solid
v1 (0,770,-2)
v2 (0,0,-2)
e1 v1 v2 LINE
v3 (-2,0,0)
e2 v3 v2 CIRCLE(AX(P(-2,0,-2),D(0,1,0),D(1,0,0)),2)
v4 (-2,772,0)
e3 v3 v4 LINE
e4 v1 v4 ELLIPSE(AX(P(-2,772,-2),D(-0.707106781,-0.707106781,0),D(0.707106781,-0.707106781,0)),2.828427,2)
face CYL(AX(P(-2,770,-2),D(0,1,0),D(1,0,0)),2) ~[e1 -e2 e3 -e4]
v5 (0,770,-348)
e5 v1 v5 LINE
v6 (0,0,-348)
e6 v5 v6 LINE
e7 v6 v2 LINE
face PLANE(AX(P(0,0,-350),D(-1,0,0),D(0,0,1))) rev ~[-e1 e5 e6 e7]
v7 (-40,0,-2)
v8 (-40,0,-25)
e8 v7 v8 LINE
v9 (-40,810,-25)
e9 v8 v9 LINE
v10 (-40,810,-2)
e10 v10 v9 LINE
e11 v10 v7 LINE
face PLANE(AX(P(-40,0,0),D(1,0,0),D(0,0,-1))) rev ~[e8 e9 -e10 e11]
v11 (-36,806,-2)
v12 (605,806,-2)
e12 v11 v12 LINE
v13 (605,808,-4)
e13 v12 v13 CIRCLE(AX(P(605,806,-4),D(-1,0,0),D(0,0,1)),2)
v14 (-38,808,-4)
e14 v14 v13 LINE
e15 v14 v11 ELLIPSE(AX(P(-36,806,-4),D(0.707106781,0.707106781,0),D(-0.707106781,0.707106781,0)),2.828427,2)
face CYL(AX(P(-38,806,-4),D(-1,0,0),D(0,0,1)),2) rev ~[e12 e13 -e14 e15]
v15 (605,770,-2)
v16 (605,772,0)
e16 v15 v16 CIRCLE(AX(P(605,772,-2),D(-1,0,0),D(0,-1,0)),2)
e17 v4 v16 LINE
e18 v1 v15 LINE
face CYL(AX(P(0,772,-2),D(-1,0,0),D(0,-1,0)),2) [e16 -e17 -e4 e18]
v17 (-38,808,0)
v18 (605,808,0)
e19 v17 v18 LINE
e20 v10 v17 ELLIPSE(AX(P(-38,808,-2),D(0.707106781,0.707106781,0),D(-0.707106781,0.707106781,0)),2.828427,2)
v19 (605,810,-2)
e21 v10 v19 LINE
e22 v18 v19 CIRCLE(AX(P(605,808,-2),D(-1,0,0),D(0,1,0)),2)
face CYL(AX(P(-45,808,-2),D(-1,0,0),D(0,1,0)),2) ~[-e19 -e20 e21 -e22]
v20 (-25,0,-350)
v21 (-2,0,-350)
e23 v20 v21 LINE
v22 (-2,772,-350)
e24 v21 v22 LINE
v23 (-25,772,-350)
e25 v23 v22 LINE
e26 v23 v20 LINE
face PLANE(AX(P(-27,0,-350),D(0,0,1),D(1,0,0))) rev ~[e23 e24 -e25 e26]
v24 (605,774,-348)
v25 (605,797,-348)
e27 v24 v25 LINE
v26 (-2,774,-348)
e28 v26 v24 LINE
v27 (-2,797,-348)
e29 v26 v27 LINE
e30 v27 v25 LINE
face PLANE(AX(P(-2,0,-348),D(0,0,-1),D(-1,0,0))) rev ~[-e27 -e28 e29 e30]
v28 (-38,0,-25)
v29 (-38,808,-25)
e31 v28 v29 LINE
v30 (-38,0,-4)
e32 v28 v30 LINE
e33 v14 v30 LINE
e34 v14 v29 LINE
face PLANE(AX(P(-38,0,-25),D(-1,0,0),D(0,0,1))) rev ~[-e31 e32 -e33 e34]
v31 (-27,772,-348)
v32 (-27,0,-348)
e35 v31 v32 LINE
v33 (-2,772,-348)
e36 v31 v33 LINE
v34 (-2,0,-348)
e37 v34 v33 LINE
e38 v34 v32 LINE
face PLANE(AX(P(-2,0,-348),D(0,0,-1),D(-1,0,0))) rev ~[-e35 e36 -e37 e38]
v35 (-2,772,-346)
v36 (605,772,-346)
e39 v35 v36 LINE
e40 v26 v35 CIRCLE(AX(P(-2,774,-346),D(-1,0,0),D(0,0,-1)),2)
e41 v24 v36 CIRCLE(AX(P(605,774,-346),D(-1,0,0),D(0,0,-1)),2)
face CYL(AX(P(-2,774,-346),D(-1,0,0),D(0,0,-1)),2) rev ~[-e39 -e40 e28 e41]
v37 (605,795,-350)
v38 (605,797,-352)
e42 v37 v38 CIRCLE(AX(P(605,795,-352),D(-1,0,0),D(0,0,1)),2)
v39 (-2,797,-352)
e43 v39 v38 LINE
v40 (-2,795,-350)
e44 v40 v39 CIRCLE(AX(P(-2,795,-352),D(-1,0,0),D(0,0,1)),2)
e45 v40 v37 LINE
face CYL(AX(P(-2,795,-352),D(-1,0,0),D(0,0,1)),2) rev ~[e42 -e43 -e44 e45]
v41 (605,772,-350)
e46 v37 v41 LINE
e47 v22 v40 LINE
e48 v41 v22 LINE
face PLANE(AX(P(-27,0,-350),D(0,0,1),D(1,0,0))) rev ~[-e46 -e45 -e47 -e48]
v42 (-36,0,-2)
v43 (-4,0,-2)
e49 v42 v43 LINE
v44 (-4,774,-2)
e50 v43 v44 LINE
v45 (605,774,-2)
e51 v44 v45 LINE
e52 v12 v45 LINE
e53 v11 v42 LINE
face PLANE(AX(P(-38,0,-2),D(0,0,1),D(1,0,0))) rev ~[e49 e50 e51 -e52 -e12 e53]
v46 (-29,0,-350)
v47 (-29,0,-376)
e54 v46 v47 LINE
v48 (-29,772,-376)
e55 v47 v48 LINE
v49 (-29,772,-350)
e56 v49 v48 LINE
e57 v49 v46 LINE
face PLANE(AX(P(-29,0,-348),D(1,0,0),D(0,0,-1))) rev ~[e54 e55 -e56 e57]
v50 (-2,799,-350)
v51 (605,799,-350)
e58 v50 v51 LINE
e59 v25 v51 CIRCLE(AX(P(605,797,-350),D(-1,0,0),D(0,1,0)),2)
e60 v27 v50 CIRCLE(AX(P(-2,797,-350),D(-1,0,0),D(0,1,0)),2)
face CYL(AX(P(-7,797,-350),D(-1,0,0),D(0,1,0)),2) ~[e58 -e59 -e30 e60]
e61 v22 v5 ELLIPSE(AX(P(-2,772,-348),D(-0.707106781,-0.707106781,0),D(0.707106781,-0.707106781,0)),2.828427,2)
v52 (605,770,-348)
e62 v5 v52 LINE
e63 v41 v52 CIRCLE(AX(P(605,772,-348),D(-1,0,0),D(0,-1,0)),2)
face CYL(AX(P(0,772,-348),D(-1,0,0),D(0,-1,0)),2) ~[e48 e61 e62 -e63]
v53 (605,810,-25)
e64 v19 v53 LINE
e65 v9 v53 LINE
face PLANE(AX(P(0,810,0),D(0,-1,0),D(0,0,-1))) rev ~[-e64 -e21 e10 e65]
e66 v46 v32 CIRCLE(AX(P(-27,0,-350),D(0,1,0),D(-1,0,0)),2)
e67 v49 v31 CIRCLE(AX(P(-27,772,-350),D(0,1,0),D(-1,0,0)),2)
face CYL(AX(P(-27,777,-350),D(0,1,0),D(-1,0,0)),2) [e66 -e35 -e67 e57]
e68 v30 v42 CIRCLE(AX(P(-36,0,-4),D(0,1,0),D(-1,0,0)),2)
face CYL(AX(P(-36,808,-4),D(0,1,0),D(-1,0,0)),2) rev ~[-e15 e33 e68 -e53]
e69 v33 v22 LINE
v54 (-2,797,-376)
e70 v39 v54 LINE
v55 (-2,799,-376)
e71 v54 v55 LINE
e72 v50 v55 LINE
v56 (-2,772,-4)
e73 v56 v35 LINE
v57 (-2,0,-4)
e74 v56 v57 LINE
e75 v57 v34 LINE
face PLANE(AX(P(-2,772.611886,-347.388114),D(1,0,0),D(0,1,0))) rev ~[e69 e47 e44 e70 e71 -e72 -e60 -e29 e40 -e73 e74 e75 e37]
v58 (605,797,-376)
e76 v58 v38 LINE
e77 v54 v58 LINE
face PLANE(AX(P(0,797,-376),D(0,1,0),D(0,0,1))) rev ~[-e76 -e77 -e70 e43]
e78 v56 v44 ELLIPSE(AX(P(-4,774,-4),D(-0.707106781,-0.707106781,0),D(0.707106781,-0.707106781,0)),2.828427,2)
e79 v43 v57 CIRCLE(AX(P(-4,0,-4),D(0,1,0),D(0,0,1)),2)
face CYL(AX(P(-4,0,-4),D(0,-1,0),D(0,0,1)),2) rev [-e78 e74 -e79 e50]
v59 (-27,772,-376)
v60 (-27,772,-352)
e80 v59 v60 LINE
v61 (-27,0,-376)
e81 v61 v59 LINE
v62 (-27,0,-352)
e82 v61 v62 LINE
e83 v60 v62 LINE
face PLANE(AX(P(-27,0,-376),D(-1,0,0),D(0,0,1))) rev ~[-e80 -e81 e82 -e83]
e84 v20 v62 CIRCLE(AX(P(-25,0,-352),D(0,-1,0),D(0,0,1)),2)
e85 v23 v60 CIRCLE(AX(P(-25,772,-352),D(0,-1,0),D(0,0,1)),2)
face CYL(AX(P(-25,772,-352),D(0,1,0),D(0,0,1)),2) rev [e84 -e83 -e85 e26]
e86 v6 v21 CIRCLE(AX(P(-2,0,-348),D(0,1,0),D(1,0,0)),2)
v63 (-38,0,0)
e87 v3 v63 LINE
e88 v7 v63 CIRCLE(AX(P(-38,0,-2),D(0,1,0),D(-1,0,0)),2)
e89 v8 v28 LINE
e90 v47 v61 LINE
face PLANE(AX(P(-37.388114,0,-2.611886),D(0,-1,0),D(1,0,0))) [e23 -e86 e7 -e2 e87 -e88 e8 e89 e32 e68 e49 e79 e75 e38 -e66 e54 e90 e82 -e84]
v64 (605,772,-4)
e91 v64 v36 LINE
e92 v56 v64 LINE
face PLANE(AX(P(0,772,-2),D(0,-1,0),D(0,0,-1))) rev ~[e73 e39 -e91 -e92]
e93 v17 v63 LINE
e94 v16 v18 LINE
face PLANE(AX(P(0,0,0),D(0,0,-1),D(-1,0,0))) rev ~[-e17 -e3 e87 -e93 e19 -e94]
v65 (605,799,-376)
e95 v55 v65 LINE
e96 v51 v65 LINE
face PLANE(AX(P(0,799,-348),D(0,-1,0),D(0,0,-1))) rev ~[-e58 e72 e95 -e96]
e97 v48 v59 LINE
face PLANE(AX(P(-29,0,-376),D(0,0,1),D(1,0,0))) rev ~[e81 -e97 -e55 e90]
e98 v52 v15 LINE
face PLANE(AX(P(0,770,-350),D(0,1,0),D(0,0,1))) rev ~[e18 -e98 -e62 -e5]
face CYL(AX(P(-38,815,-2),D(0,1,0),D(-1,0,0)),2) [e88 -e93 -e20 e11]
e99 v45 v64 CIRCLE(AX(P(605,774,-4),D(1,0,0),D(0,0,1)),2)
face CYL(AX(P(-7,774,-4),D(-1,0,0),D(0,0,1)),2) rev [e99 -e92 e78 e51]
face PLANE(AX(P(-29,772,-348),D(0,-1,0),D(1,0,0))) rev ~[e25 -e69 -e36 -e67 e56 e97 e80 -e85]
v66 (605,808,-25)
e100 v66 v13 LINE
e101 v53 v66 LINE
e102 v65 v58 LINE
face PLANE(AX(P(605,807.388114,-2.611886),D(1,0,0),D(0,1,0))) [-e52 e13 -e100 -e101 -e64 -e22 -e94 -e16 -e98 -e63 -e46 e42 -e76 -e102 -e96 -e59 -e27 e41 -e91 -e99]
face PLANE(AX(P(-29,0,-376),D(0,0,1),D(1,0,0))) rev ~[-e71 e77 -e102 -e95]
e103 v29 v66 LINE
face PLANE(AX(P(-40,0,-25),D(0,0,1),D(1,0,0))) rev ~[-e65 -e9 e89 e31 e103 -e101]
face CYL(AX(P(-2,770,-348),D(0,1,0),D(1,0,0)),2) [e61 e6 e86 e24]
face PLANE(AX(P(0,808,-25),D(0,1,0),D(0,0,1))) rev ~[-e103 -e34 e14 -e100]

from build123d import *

# Parameters (mm, degrees)
F3_W         = 27
F3_H         = 27
F4_DEPTH     = 30
F5_T1_DEPTH  = 607
F5_T3_DEPTH  = 772
F5_T5_DEPTH  = 808
F5_T7_DEPTH  = 643
F5_T13_DEPTH = 777
F5_T17_DEPTH = 612
F5_T20_DEPTH = 617
F5_T22_DEPTH = 782
F5_T24_DEPTH = 820
F5_T26_DEPTH = 775
F5_T28_DEPTH = 610
F5_T30_DEPTH = 655
F5_T36_DEPTH = 780
F5_T40_DEPTH = 615
F5_T47_DEPTH = 780
F5_T51_DEPTH = 615


# Not quite as in the source:
# - a fillet or chamfer that OpenCascade refuses, or shapes differently, is made with other operations: its cross-section is extruded or revolved along the edge and cut away or added


with BuildPart() as f2:
    # F2: sweep along a path in F1
    with BuildLine(Plane.XY) as f2_path:
        Line((0, 0), (0, 770))
        Line((0, 770), (605, 770))
    # F0 (on Front) → F2 (sweep)
    with BuildSketch(Plane.XZ):
        Polygon((0, -350), (0, 0), (-40, 0), (-40, -25), (-38, -25), (-38, -2), (-2, -2), (-2, -348), (-29, -348), (-29, -376), (-27, -376), (-27, -350), align=None)
    sweep(path=f2_path.line, transition=Transition.RIGHT)

    # F3 (on face) → F4 (cut)
    with BuildSketch(Plane.XY.offset(-348)):
        with Locations((-15.5, 785.5)):
            Rectangle(F3_W, F3_H)
    extrude(amount=-F4_DEPTH, mode=Mode.SUBTRACT)

    # F5: fillet of radius 2 on 15 edges, made by hand

    # F5_s2 → F5_t1 (join)
    with BuildSketch(Plane.YZ.offset(-2)):
        with BuildLine():
            ThreePointArc((774, -348), (772.5857864376, -347.4142135624), (772, -346))
            Line((772, -346), (772, -348))
            Line((772, -348), (774, -348))
        make_face()
        with BuildLine():
            ThreePointArc((774, -2), (772.5857864376, -2.5857864376), (772, -4))
            Line((772, -4), (772, -2))
            Line((772, -2), (774, -2))
        make_face()
        with BuildLine():
            ThreePointArc((795, -350), (796.4142135624, -350.5857864376), (797, -352))
            Line((797, -352), (797, -350))
            Line((797, -350), (795, -350))
        make_face()
    extrude(amount=F5_T1_DEPTH)

    # F5_s4 → F5_t3 (join)
    with BuildSketch(Plane.XZ.offset(-772)):
        with BuildLine():
            ThreePointArc((-4, -2), (-2.5857864376, -2.5857864376), (-2, -4))
            Line((-2, -4), (-2, -2))
            Line((-2, -2), (-4, -2))
        make_face()
        with BuildLine():
            ThreePointArc((-25, -350), (-26.4142135624, -350.5857864376), (-27, -352))
            Line((-27, -352), (-27, -350))
            Line((-27, -350), (-25, -350))
        make_face()
    extrude(amount=F5_T3_DEPTH)

    # F5_s6 → F5_t5 (join)
    with BuildSketch(Plane.XZ.offset(-808)):
        with BuildLine():
            ThreePointArc((-38, -4), (-37.4142135624, -2.5857864376), (-36, -2))
            Line((-36, -2), (-38, -2))
            Line((-38, -2), (-38, -4))
        make_face()
    extrude(amount=F5_T5_DEPTH)

    # F5_s8 → F5_t7 (join)
    with BuildSketch(Plane.YZ.offset(-38)):
        with BuildLine():
            ThreePointArc((806, -2), (807.4142135624, -2.5857864376), (808, -4))
            Line((808, -4), (808, -2))
            Line((808, -2), (806, -2))
        make_face()
    extrude(amount=F5_T7_DEPTH)


with BuildPart() as f5_tool11:
    # F5_s12 → F5_t13 (new body)
    with BuildSketch(Plane.XZ):
        with BuildLine():
            ThreePointArc((-4, -2), (-2.5857864376, -2.5857864376), (-2, -4))
            Line((-2, -4), (-2, -2))
            Line((-2, -2), (-4, -2))
        make_face()
    extrude(amount=-F5_T13_DEPTH)

    split(bisect_by=Plane.XZ.offset(-772), keep=Keep.BOTTOM)


with BuildPart() as f5_tool15:
    # F5_s16 → F5_t17 (new body)
    with BuildSketch(Plane.YZ.offset(-7)):
        with BuildLine():
            ThreePointArc((774, -2), (772.5857864376, -2.5857864376), (772, -4))
            Line((772, -4), (772, -2))
            Line((772, -2), (774, -2))
        make_face()
    extrude(amount=F5_T17_DEPTH)

    split(bisect_by=Plane.YZ.offset(-2), keep=Keep.BOTTOM)


with BuildPart() as f5_tool11_1:
    add(f5_tool11.part)

    # F5_t19: intersect F5_tool15
    add(f5_tool15.part, mode=Mode.INTERSECT)


with BuildPart() as f2_1:
    add(f2.part)

    # F5_t9: union F5_tool11
    add(f5_tool11_1.part)

    # F5_s21 → F5_t20 (cut)
    with BuildSketch(Plane.YZ.offset(-7)):
        with BuildLine():
            ThreePointArc((799, -350), (798.4142135624, -348.5857864376), (797, -348))
            Line((797, -348), (799, -348))
            Line((799, -348), (799, -350))
        make_face()
    extrude(amount=F5_T20_DEPTH, mode=Mode.SUBTRACT)

    # F5_s23 → F5_t22 (cut)
    with BuildSketch(Plane.XZ.offset(-777)):
        with BuildLine():
            ThreePointArc((-29, -350), (-28.4142135624, -348.5857864376), (-27, -348))
            Line((-27, -348), (-29, -348))
            Line((-29, -348), (-29, -350))
        make_face()
    extrude(amount=F5_T22_DEPTH, mode=Mode.SUBTRACT)

    # F5_s25 → F5_t24 (cut)
    with BuildSketch(Plane.XZ.offset(-815)):
        with BuildLine():
            ThreePointArc((-40, -2), (-39.4142135624, -0.5857864376), (-38, 0))
            Line((-38, 0), (-40, 0))
            Line((-40, 0), (-40, -2))
        make_face()
    extrude(amount=F5_T24_DEPTH, mode=Mode.SUBTRACT)

    # F5_s27 → F5_t26 (cut)
    with BuildSketch(Plane.XZ.offset(-770)):
        with BuildLine():
            ThreePointArc((0, -2), (-0.5857864376, -0.5857864376), (-2, 0))
            Line((-2, 0), (0, 0))
            Line((0, 0), (0, -2))
        make_face()
        with BuildLine():
            ThreePointArc((0, -348), (-0.5857864376, -349.4142135624), (-2, -350))
            Line((-2, -350), (0, -350))
            Line((0, -350), (0, -348))
        make_face()
    extrude(amount=F5_T26_DEPTH, mode=Mode.SUBTRACT)

    # F5_s29 → F5_t28 (cut)
    with BuildSketch(Plane.YZ):
        with BuildLine():
            ThreePointArc((770, -2), (770.5857864376, -0.5857864376), (772, 0))
            Line((772, 0), (770, 0))
            Line((770, 0), (770, -2))
        make_face()
        with BuildLine():
            ThreePointArc((770, -348), (770.5857864376, -349.4142135624), (772, -350))
            Line((772, -350), (770, -350))
            Line((770, -350), (770, -348))
        make_face()
    extrude(amount=F5_T28_DEPTH, mode=Mode.SUBTRACT)

    # F5_s31 → F5_t30 (cut)
    with BuildSketch(Plane.YZ.offset(-45)):
        with BuildLine():
            ThreePointArc((810, -2), (809.4142135624, -0.5857864376), (808, 0))
            Line((808, 0), (810, 0))
            Line((810, 0), (810, -2))
        make_face()
    extrude(amount=F5_T30_DEPTH, mode=Mode.SUBTRACT)


with BuildPart() as f5_tool34:
    # F5_s35 → F5_t36 (new body)
    with BuildSketch(Plane.XZ.offset(5)):
        with BuildLine():
            ThreePointArc((0, -2), (-0.5857864376, -0.5857864376), (-2, 0))
            Line((-2, 0), (0, 0))
            Line((0, 0), (0, -2))
        make_face()
    extrude(amount=-F5_T36_DEPTH)

    split(bisect_by=Plane.XZ.offset(-770), keep=Keep.BOTTOM)


with BuildPart() as f5_tool38:
    # F5_s39 → F5_t40 (new body)
    with BuildSketch(Plane.YZ.offset(-5)):
        with BuildLine():
            ThreePointArc((770, -2), (770.5857864376, -0.5857864376), (772, 0))
            Line((772, 0), (770, 0))
            Line((770, 0), (770, -2))
        make_face()
    extrude(amount=F5_T40_DEPTH)

    split(bisect_by=Plane.YZ, keep=Keep.BOTTOM)


with BuildPart() as f5_tool34_1:
    add(f5_tool34.part)

    # F5_t42: intersect F5_tool38
    add(f5_tool38.part, mode=Mode.INTERSECT)


with BuildPart() as f2_2:
    add(f2_1.part)

    # F5_t32: cut F5_tool34
    add(f5_tool34_1.part, mode=Mode.SUBTRACT)


with BuildPart() as f5_tool45:
    # F5_s46 → F5_t47 (new body)
    with BuildSketch(Plane.XZ.offset(5)):
        with BuildLine():
            ThreePointArc((0, -348), (-0.5857864376, -349.4142135624), (-2, -350))
            Line((-2, -350), (0, -350))
            Line((0, -350), (0, -348))
        make_face()
    extrude(amount=-F5_T47_DEPTH)

    split(bisect_by=Plane.XZ.offset(-770), keep=Keep.BOTTOM)


with BuildPart() as f5_tool49:
    # F5_s50 → F5_t51 (new body)
    with BuildSketch(Plane.YZ.offset(-5)):
        with BuildLine():
            ThreePointArc((770, -348), (770.5857864376, -349.4142135624), (772, -350))
            Line((772, -350), (770, -350))
            Line((770, -350), (770, -348))
        make_face()
    extrude(amount=F5_T51_DEPTH)

    split(bisect_by=Plane.YZ, keep=Keep.BOTTOM)


with BuildPart() as f5_tool45_1:
    add(f5_tool45.part)

    # F5_t53: intersect F5_tool49
    add(f5_tool49.part, mode=Mode.INTERSECT)


with BuildPart() as f2_3:
    add(f2_2.part)

    # F5_t43: cut F5_tool45
    add(f5_tool45_1.part, mode=Mode.SUBTRACT)


solid = f2_3.part
